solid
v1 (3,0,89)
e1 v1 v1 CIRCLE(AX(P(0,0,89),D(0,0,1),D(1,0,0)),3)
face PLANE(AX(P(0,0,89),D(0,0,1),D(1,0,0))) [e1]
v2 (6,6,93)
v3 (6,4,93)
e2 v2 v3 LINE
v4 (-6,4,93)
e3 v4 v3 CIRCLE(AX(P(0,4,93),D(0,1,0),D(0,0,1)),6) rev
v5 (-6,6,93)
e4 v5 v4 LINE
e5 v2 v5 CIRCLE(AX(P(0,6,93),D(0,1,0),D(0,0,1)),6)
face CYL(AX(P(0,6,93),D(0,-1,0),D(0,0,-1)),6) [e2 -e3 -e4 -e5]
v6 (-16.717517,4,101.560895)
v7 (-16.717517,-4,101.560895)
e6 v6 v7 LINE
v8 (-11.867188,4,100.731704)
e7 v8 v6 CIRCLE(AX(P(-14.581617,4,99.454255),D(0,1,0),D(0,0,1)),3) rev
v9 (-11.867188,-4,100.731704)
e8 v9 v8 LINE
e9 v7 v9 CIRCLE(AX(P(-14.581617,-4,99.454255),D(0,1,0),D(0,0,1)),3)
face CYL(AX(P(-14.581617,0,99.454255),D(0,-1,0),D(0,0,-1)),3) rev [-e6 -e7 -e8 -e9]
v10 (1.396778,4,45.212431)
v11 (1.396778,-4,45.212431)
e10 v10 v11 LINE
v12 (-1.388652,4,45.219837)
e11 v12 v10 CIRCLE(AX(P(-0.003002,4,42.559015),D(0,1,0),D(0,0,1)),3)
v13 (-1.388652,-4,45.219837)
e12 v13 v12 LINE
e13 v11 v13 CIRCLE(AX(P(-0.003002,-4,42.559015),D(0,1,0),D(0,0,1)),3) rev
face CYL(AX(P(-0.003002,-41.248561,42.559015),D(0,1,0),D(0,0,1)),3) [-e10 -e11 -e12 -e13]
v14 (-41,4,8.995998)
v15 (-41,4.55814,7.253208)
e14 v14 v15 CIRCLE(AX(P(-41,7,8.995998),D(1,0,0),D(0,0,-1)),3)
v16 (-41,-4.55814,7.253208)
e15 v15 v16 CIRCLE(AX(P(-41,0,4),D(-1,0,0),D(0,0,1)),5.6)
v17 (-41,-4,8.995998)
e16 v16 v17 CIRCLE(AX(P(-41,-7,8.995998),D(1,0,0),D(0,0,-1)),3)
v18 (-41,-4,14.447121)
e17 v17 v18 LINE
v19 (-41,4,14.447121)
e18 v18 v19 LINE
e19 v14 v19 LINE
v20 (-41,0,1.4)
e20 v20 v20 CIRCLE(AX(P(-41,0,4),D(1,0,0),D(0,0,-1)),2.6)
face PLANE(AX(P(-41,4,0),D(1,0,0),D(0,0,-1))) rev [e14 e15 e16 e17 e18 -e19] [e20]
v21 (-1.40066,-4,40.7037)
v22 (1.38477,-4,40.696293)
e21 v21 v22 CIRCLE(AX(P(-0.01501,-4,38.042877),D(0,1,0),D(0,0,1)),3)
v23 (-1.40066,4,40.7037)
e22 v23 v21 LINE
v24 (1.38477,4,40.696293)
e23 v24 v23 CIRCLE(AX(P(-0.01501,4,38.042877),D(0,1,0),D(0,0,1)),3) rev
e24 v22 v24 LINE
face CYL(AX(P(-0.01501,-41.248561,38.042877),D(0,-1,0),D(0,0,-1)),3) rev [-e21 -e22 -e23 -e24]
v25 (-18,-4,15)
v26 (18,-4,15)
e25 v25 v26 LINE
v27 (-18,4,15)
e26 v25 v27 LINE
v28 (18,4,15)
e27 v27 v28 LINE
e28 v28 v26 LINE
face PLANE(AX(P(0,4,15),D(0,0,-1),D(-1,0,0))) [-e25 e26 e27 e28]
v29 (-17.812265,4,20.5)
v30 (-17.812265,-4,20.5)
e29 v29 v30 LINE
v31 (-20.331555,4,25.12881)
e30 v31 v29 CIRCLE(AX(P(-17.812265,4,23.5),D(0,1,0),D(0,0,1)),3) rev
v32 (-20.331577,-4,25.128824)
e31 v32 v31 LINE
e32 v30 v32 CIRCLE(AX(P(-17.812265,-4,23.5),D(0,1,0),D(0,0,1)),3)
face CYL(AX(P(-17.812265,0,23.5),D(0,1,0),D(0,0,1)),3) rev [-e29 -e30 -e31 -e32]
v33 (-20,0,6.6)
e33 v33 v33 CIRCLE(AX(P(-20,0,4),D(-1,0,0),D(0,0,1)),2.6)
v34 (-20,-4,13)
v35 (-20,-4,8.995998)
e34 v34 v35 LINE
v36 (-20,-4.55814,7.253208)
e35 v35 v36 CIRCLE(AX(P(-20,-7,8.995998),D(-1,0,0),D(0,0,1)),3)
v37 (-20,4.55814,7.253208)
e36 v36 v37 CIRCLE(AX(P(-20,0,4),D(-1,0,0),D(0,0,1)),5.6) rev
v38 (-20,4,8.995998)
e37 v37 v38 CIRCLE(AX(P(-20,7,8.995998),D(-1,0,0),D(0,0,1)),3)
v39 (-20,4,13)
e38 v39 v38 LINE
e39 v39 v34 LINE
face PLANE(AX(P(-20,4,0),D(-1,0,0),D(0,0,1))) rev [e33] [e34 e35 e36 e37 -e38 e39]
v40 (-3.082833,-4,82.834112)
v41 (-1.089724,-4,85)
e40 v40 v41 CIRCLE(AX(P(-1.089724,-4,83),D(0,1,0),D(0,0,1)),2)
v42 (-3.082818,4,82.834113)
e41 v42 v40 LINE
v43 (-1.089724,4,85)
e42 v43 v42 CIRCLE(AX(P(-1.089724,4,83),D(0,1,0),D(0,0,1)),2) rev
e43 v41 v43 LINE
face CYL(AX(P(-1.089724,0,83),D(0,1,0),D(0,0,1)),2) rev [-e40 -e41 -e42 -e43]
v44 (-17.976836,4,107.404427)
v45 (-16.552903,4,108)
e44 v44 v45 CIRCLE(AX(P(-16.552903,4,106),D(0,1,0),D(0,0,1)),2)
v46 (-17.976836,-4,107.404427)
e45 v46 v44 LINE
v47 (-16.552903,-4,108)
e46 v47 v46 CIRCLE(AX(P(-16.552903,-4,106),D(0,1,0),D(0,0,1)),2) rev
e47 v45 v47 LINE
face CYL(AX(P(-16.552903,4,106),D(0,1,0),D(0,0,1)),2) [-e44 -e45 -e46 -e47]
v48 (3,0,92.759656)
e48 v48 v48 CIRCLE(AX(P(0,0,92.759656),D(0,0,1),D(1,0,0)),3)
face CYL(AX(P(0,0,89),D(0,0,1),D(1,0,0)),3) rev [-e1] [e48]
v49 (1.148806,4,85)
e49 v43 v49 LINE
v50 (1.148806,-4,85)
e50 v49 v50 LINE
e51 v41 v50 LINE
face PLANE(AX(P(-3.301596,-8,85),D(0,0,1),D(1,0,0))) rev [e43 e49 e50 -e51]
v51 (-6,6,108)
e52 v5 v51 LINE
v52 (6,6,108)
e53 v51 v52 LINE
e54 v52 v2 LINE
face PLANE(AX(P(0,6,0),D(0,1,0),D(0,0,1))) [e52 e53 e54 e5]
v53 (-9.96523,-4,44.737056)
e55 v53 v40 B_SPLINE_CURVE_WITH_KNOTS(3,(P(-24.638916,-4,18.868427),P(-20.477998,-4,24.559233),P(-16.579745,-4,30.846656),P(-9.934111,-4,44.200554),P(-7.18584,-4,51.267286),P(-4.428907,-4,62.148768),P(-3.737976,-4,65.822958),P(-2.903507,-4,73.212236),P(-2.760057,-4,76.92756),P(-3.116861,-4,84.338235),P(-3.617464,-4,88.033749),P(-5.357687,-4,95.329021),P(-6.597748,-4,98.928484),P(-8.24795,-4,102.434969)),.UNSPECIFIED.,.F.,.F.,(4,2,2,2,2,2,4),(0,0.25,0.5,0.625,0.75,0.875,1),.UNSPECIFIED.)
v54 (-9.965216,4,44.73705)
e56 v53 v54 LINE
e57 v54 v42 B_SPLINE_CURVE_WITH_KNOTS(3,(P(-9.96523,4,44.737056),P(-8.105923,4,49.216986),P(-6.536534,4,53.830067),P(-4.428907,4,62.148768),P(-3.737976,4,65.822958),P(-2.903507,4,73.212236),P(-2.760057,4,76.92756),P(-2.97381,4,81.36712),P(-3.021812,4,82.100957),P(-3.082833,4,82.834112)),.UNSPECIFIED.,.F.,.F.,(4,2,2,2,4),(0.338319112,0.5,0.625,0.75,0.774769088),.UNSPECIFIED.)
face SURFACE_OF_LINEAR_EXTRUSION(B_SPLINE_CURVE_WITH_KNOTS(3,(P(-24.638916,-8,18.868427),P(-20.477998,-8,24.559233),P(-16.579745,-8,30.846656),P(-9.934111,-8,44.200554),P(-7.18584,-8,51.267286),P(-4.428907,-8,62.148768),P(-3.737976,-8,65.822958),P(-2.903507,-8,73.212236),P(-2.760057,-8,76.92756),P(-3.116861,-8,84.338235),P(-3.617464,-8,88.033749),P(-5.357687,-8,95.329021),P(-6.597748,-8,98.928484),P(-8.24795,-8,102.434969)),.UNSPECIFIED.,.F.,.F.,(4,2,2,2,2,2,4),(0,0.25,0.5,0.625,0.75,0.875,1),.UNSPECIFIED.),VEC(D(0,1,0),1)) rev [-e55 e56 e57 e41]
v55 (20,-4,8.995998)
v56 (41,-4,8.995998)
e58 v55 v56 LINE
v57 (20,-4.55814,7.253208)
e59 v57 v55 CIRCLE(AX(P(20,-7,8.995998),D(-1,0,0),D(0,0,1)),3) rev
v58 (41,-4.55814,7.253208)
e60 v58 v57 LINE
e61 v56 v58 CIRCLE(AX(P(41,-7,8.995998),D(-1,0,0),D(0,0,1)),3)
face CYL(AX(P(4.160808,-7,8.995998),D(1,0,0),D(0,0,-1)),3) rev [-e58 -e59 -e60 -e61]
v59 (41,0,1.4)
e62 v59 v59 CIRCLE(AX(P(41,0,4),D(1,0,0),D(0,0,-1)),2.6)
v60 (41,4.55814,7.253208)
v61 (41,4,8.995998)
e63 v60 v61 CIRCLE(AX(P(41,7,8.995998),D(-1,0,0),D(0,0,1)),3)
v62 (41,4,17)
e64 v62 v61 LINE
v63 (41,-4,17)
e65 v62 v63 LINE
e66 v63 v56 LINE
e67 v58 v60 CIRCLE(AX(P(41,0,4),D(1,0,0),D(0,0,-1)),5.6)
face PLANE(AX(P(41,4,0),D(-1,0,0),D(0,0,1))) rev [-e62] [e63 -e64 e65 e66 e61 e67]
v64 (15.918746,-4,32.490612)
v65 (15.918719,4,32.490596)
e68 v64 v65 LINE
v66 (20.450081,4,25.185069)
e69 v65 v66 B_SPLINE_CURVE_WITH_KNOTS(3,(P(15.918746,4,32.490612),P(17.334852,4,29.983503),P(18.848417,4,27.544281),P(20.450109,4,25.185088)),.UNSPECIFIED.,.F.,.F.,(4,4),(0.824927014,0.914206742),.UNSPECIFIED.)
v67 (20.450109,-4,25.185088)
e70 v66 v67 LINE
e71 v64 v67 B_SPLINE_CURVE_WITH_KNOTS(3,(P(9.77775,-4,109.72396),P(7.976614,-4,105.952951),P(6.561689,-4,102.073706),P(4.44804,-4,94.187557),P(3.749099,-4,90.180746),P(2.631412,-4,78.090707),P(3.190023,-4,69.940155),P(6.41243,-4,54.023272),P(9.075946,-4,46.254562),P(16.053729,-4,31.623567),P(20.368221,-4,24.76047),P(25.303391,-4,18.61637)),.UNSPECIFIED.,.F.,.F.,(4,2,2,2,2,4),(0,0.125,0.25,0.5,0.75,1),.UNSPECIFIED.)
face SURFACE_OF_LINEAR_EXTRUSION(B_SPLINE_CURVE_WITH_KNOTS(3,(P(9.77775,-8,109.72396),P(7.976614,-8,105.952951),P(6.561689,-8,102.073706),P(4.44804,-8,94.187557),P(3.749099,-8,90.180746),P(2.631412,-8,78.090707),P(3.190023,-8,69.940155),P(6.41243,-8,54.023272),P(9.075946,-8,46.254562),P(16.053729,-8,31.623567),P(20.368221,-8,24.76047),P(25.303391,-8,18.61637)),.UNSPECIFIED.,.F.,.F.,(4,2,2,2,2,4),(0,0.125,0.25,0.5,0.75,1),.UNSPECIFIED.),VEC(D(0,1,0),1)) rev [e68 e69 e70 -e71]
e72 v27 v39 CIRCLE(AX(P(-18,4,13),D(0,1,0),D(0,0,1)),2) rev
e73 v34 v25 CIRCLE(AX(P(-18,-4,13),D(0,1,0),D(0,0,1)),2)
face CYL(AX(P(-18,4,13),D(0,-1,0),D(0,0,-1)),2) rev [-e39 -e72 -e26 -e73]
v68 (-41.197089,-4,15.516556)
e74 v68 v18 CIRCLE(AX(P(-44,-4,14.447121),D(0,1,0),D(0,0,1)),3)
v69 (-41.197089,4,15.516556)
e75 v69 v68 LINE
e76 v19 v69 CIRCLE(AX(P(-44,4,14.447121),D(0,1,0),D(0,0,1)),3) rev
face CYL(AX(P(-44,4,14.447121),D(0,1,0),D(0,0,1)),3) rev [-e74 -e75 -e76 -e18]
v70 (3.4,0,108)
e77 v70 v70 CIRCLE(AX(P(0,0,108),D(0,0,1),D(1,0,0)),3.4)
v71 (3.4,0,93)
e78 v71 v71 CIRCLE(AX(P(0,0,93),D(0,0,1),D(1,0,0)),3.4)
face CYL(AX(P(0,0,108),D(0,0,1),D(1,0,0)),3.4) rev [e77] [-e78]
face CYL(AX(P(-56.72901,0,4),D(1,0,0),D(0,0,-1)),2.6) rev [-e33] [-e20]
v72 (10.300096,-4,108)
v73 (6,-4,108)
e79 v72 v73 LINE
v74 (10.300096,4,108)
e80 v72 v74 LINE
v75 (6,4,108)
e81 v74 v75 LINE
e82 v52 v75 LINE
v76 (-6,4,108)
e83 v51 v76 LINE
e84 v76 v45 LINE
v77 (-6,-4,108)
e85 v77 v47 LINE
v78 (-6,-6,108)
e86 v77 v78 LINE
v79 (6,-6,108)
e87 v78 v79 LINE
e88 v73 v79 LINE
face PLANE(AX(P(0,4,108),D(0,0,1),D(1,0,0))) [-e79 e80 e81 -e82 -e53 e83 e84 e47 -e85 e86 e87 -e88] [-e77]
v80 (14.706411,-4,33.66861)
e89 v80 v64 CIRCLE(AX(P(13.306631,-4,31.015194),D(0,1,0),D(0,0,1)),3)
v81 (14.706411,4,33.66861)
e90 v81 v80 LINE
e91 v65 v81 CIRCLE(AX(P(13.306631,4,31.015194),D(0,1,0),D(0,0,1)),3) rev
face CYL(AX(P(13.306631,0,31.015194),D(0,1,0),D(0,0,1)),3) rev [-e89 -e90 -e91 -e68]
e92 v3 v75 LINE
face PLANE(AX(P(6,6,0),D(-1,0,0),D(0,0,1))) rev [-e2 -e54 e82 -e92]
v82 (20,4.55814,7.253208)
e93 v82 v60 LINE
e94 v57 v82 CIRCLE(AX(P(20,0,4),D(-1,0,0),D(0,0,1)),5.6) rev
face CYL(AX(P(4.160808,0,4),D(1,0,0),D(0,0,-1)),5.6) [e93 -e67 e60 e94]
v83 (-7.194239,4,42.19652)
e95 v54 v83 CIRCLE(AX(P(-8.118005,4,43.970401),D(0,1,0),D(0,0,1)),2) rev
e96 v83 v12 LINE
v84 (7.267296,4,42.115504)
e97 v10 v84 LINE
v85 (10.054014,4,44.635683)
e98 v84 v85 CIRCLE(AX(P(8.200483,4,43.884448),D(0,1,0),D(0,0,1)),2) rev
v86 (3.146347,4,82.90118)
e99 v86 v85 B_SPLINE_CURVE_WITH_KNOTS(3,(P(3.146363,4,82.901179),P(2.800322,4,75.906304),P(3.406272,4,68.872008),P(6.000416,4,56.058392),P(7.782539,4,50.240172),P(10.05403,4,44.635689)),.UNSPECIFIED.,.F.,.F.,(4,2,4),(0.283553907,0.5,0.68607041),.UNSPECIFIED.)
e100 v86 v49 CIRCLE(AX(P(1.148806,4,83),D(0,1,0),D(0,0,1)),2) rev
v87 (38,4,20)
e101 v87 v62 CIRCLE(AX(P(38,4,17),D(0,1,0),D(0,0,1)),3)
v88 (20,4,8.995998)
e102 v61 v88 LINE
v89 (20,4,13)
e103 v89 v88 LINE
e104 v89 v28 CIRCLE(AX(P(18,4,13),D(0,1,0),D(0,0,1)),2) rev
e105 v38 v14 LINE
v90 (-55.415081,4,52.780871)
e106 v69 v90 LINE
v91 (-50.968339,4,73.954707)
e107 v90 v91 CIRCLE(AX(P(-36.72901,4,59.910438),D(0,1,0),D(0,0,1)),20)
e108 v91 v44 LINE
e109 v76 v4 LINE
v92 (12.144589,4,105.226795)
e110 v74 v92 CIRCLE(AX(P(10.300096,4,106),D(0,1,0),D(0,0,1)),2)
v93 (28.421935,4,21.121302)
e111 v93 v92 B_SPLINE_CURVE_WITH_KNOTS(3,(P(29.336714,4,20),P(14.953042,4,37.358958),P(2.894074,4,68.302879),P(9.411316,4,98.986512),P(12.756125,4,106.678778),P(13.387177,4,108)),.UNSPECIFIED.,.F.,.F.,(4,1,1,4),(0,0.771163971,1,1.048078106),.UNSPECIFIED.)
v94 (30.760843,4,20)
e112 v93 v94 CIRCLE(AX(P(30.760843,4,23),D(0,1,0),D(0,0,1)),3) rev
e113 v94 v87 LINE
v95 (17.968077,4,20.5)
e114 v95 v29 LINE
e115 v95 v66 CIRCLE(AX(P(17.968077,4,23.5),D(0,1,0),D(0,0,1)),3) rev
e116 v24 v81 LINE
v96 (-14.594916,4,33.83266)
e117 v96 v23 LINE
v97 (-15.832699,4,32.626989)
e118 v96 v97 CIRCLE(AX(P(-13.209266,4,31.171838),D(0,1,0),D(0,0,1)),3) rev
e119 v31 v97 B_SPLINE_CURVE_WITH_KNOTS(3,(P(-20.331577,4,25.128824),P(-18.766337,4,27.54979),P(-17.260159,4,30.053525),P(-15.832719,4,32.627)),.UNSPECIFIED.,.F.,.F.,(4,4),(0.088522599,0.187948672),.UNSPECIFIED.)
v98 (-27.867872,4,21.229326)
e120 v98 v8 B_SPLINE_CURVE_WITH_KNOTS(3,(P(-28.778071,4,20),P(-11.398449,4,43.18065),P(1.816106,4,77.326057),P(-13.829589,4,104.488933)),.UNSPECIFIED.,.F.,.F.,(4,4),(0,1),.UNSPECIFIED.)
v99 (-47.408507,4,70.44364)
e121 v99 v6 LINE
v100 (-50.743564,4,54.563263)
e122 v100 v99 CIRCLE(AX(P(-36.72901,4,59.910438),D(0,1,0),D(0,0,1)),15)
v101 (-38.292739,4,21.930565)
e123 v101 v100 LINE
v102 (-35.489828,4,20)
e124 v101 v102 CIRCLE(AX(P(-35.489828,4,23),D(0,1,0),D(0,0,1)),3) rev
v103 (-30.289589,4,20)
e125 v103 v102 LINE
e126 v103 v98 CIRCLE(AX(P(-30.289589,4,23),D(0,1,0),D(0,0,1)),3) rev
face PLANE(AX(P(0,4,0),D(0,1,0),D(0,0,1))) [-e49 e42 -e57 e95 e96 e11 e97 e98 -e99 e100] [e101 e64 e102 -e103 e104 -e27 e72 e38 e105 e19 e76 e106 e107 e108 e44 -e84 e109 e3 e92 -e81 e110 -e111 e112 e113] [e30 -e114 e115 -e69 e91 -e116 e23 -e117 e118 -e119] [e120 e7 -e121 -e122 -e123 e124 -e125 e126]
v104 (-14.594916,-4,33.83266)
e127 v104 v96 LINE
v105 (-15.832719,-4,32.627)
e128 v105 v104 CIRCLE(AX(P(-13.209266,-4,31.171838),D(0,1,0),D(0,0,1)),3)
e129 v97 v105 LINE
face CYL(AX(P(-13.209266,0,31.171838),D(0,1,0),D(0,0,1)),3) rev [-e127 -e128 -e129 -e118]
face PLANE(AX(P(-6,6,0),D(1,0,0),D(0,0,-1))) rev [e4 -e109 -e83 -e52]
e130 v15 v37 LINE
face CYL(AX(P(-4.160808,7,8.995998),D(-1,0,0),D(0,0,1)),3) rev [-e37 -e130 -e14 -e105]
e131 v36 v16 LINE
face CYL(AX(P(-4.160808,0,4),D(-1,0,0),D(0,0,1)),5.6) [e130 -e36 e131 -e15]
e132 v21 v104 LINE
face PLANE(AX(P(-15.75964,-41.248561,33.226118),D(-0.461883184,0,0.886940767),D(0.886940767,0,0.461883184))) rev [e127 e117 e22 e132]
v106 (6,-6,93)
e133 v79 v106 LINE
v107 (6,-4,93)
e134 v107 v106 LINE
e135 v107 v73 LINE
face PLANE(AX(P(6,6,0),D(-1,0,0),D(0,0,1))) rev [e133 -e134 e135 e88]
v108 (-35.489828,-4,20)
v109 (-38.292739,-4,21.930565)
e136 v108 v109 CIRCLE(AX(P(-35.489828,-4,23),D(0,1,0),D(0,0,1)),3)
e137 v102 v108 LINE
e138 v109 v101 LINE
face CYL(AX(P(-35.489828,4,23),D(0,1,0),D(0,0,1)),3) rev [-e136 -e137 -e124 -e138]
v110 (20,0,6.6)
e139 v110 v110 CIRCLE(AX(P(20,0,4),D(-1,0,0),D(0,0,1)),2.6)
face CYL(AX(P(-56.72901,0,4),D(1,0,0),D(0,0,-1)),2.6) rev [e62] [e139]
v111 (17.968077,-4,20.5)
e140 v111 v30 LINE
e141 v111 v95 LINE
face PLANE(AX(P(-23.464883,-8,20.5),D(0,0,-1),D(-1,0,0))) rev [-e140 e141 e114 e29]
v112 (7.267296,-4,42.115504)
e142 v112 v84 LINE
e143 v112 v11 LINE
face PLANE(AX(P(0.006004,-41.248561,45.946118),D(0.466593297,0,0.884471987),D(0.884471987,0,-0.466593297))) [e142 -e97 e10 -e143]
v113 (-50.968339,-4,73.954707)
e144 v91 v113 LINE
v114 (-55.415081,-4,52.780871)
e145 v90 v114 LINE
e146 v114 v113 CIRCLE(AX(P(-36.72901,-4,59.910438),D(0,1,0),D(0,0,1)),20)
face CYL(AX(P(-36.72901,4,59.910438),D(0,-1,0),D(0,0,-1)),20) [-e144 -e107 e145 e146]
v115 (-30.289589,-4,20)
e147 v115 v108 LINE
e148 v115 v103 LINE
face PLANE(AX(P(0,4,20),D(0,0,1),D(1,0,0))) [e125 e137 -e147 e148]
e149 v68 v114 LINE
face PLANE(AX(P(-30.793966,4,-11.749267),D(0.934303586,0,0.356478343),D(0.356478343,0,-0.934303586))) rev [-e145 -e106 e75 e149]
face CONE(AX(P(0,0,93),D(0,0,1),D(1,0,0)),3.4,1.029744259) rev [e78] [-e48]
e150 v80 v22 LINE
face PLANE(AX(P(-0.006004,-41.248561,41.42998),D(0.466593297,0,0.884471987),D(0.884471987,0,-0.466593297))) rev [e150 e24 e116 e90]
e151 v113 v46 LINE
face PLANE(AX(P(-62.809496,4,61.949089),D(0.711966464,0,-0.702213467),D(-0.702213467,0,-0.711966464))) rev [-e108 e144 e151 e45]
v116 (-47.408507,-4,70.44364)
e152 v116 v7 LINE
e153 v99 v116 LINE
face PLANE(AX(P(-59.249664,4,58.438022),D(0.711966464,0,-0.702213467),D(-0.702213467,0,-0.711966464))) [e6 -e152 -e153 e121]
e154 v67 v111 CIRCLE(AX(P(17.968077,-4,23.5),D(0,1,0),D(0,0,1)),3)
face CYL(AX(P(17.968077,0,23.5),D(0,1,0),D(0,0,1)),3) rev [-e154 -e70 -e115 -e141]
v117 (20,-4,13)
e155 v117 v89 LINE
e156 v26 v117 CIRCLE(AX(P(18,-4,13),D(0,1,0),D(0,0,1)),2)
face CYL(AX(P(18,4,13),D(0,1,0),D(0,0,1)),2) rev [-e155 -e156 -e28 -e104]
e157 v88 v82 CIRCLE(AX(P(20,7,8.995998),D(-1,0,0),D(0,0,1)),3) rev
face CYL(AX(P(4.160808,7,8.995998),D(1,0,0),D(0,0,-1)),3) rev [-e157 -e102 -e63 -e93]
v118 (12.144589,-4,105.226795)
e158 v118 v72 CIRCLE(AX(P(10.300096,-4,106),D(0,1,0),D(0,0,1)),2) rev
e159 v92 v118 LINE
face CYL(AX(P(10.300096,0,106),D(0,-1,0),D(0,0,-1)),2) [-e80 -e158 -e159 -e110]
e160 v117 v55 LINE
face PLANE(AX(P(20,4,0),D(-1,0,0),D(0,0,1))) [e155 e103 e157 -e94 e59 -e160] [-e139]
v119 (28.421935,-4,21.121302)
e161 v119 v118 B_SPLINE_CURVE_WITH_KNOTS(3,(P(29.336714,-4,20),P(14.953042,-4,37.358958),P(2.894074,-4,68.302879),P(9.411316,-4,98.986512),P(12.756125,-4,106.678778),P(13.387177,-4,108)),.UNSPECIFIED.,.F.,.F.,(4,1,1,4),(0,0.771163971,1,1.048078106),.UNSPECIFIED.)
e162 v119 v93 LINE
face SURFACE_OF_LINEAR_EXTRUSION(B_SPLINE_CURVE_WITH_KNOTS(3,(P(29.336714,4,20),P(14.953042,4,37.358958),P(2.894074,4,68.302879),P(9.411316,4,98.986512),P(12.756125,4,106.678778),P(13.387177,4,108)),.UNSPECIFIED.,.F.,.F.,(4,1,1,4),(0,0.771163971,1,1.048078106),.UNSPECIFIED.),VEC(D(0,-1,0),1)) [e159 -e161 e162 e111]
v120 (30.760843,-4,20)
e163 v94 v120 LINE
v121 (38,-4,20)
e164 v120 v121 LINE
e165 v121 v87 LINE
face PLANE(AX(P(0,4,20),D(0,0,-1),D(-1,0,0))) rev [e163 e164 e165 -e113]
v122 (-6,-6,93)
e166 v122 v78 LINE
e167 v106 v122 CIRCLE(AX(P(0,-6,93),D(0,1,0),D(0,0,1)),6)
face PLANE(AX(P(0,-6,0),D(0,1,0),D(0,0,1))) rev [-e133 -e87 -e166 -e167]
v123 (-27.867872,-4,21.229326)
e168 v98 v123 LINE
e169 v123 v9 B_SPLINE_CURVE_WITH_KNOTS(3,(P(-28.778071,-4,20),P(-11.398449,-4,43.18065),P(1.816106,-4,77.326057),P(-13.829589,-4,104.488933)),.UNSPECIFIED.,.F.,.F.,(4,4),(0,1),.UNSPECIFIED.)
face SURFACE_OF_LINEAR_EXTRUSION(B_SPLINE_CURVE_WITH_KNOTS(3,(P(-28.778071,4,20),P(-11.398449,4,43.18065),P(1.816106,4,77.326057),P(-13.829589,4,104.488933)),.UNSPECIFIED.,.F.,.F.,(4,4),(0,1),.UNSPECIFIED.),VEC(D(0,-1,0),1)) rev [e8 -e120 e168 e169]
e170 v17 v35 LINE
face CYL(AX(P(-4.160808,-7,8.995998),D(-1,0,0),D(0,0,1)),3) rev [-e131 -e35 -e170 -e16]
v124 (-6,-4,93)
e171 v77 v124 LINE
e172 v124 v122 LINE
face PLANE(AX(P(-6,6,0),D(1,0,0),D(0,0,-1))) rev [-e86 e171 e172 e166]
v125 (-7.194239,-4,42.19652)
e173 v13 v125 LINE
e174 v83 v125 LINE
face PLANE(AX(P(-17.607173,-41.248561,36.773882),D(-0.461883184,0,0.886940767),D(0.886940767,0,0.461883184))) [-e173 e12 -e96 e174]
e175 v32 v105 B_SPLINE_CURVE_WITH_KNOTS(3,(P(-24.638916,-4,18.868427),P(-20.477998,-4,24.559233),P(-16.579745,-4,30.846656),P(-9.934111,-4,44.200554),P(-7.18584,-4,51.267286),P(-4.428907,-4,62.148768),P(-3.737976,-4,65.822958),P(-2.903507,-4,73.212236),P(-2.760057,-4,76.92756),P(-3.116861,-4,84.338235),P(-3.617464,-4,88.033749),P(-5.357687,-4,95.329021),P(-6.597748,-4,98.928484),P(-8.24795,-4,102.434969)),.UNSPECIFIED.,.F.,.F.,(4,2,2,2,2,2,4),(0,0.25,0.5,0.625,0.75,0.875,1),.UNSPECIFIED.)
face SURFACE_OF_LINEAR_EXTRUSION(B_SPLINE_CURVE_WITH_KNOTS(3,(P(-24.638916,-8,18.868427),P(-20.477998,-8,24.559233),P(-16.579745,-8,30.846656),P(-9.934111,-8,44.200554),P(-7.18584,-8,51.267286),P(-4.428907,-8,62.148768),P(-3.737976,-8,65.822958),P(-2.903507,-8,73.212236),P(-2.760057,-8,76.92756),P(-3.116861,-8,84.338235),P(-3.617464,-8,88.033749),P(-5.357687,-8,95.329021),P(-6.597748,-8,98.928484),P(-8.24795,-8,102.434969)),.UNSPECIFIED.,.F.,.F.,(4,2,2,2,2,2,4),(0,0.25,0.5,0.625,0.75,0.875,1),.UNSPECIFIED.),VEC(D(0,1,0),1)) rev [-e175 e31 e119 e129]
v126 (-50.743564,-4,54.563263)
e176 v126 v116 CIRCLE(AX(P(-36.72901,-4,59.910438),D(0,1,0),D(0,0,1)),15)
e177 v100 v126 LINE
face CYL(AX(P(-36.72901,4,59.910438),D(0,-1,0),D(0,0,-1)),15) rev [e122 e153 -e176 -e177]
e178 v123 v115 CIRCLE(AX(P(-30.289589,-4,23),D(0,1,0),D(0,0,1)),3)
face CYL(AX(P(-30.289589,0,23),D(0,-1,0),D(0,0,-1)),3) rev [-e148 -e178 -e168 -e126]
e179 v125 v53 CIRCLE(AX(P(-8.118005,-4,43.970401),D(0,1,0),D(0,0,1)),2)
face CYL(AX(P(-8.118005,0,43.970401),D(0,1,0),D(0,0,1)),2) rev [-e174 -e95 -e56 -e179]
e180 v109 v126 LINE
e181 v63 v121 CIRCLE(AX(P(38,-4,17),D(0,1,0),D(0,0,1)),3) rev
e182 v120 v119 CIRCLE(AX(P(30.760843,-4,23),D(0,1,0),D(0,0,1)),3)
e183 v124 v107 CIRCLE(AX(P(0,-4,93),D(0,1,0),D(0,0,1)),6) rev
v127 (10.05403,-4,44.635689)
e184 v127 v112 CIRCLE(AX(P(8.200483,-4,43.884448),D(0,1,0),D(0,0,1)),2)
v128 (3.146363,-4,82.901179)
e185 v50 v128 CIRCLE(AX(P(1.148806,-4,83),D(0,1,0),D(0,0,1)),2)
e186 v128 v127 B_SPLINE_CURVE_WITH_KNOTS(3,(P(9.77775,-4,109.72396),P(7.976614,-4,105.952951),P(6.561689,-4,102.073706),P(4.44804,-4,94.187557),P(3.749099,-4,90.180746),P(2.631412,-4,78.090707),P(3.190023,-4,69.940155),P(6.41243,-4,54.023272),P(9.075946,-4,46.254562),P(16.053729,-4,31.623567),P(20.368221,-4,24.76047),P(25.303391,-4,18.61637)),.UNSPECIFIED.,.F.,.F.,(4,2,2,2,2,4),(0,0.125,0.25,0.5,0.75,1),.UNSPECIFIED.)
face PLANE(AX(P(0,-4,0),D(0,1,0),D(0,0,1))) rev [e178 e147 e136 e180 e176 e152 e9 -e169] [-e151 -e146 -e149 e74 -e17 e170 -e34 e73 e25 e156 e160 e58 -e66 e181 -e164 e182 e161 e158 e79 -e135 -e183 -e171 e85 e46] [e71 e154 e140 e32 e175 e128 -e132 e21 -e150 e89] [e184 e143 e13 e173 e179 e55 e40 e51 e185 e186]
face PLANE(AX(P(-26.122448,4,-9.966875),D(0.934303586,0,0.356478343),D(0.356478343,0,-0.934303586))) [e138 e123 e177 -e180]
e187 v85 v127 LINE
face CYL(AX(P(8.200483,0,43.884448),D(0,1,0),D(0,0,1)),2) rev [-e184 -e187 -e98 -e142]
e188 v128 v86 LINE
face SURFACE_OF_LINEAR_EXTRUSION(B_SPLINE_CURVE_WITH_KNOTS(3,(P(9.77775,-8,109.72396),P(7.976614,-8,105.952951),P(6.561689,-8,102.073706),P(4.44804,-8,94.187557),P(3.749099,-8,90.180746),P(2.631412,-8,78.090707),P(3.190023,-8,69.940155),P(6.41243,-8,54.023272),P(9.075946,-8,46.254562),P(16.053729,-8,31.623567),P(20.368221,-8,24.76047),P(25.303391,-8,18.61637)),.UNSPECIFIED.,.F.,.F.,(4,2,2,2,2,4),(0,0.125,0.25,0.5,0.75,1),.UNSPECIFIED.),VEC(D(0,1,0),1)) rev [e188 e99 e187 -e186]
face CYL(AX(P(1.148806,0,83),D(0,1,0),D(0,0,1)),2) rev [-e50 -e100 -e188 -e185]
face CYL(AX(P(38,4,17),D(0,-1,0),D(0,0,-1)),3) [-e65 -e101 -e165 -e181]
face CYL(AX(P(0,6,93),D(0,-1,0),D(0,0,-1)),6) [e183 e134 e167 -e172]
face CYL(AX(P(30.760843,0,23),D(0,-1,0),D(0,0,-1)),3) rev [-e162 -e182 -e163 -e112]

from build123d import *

# Parameters (mm, degrees)
EXTRUDE_1_DEPTH        = 4
FILLET_1_R             = 4
SKETCH_4_R             = 2.6
CUT_EXTRUDE_1_DEPTH    = 146.708473979
FILLET_2_R             = 3
FILLET_3_R             = 3
SKETCH_6_R             = 6
EXTRUDE_3_DEPTH        = 6
CUT_EXTRUDE_2_DEPTH    = 12
FILLET_4_R             = 3
FILLET_5_R             = 2
FILLET_6_R             = 2
EXTRUDE_5_DEPTH        = 8
FILLET_7_R             = 2
FILLET_8_R             = 3
FILLET_9_R             = 2
FILLET_10_R            = 2
SKETCH_11_R            = 3
CUT_EXTRUDE_3_DEPTH    = 19
HOLE_WIZARD_M8_3_D     = 6.8
HOLE_WIZARD_M8_3_DEPTH = 15
HOLE_WIZARD_M8_3_TIP   = 2.042926105
SKETCH_14_R            = 5.6
SKETCH_14_R_2          = 2.6
EXTRUDE_6_DEPTH        = 21
EXTRUDE_START          = -21
SKETCH_15_R            = 5.6
SKETCH_15_R_2          = 2.6
EXTRUDE_7_DEPTH        = 21
FILLET_11_R            = 3


with BuildPart() as part:
    # 草图1 → 凸台-拉伸1 (new, symmetric)
    with BuildSketch(Plane(origin=(0, 0, 0), x_dir=(1, 0, 0), z_dir=(0, 1, 0))):
        with BuildLine():
            Line((-20, 0), (-41, 0))
            Line((-41, 0), (-41, -15))
            Line((-41, -15), (-55.415081473, -52.780871033))
            ThreePointArc((-55.415081473, -52.780871033), (-56.302035651, -64.020992263), (-50.968339036, -73.954707247))
            Line((-50.968339036, -73.954707247), (-17.38942166, -108))
            Line((-17.38942166, -108), (13.387176951, -108))
            add(Edge.make_bspline(
                [(11.643587669, -103.995199619), (12.175396299, -105.343239297), (12.756125427, -106.67877823), (13.387176951, -108)],
                knots=[1, 1, 1, 1, 1.048078106, 1.048078106, 1.048078106, 1.048078106], degree=3))
            add(Edge.make_bspline(
                [(29.336714137, -20), (14.953042407, -37.358957509), (2.894073745, -68.302879354), (9.112352893, -97.578972573), (11.643587669, -103.995199619)],
                knots=[0, 0, 0, 0, 0.771163971, 1, 1, 1, 1], degree=3))
            Line((29.336714137, -20), (41, -20))
            Line((41, -20), (41, -15))
            Line((41, -15), (41, 0))
            Line((41, 0), (20, 0))
            Line((20, 0), (20, -15))
            Line((20, -15), (-20, -15))
            Line((-20, -15), (-20, 0))
        make_face()
        with BuildLine():
            Line((-37.556142637, -20), (-28.778071319, -20))
            add(Edge.make_bspline(
                [(-28.778071319, -20), (-11.398449347, -43.180650425), (1.816105739, -77.326056937), (-13.829589339, -104.488932663)],
                knots=[0, 0, 0, 0, 1, 1, 1, 1], degree=3))
            Line((-13.829589339, -104.488932663), (-47.408506715, -70.44363991))
            ThreePointArc((-47.408506715, -70.44363991), (-51.408779177, -62.993353671), (-50.743563543, -54.563262749))
            Line((-50.743563543, -54.563262749), (-37.556142637, -20))
        make_face(mode=Mode.SUBTRACT)
    extrude(amount=EXTRUDE_1_DEPTH, both=True)

    # 圆角1
    fillet_1_edges = [part.edges().sort_by_distance(p)[0] for p in [
        (-30.5, 4, 0),
        (-30.5, -4, 0),
        (30.5, -4, 0),
        (30.5, 4, 0),
    ]]
    fillet(fillet_1_edges, radius=FILLET_1_R - 0.0001)  # a hair under: the kernel refuses the full size

    # 草图4 → 切除-拉伸1 (cut, through all)
    with BuildSketch(Plane(origin=(41, 0, 0), x_dir=(0, 0, -1), z_dir=(1, 0, 0))):
        with Locations((-4, 0)):
            Circle(SKETCH_4_R)
    extrude(amount=-CUT_EXTRUDE_1_DEPTH, mode=Mode.SUBTRACT)

    # 圆角2
    fillet_2_edges = [part.edges().sort_by_distance(p)[0] for p in [
        (-41, 0, 15),
        (-28.778071319, -2, 20),
        (-37.556142637, 0, 20),
        (41, 0, 20),
        (29.336714137, -2, 20),
    ]]
    fillet(fillet_2_edges, radius=FILLET_2_R)

    # 圆角3
    fillet_3_edges = [part.edges().sort_by_distance(p)[0] for p in [
        (-13.829589339, -2, 104.488932663),
    ]]
    fillet(fillet_3_edges, radius=FILLET_3_R)

    # 草图6 → 凸台-拉伸3 (add, symmetric)
    with BuildSketch(Plane(origin=(0, 0, 0), x_dir=(1, 0, 0), z_dir=(0, 1, 0))):
        with BuildLine():
            ThreePointArc((6, -93), (0, -99), (-6, -93))
            Line((-6, -93), (-6, -108))
            Line((-6, -108), (6, -108))
            Line((6, -108), (6, -93))
        make_face()
        with Locations((0, -93)):
            Circle(SKETCH_6_R)
    extrude(amount=EXTRUDE_3_DEPTH, both=True)

    # 草图9 → 切除-拉伸2 (cut)
    with BuildSketch(Plane(origin=(0, 4, 0), x_dir=(1, 0, 0), z_dir=(0, 1, 0))):
        with BuildLine():
            Line((-3.301596304, -85), (3.279031365, -85))
            add(Edge.make_bspline(
                [(23.82705745, -20.5), (19.505008519, -26.151605233), (15.701306988, -32.362525218), (9.075946345, -46.254561975), (6.412430162, -54.023271907), (3.266661612, -69.561604001), (2.686935669, -77.315763608), (3.279031365, -85)],
                knots=[0.025253164, 0.025253164, 0.025253164, 0.025253164, 0.25, 0.25, 0.5, 0.5, 0.73810851, 0.73810851, 0.73810851, 0.73810851], degree=3))
            Line((23.82705745, -20.5), (-23.464882608, -20.5))
            add(Edge.make_bspline(
                [(-23.464882608, -20.5), (-19.745298249, -25.752793711), (-16.265276937, -31.478555693), (-9.934110548, -44.200553579), (-7.185840369, -51.267285983), (-4.428907167, -62.148768173), (-3.737975942, -65.822957616), (-2.903507141, -73.212236362), (-2.760056502, -76.927560065), (-3.008657599, -82.090891991), (-3.128742658, -83.54736568), (-3.301596304, -85)],
                knots=[0.023659765, 0.023659765, 0.023659765, 0.023659765, 0.25, 0.25, 0.5, 0.5, 0.625, 0.625, 0.75, 0.75, 0.799185621, 0.799185621, 0.799185621, 0.799185621], degree=3))
        make_face()
    extrude(amount=-CUT_EXTRUDE_2_DEPTH, mode=Mode.SUBTRACT)

    # 圆角4
    fillet_4_edges = [part.edges().sort_by_distance(p)[0] for p in [
        (23.82705745, 0, 20.5),
        (-23.464882608, 0, 20.5),
    ]]
    fillet(fillet_4_edges, radius=FILLET_4_R)

    # 圆角5
    fillet_5_edges = [part.edges().sort_by_distance(p)[0] for p in [
        (-3.301596304, 0, 85),
        (3.279031365, 0, 85),
    ]]
    fillet(fillet_5_edges, radius=FILLET_5_R)

    # 圆角6
    fillet_6_edges = [part.edges().sort_by_distance(p)[0] for p in [
        (-20, 0, 15),
        (20, 0, 15),
    ]]
    fillet(fillet_6_edges, radius=FILLET_6_R)

    # 草图10 → 凸台-拉伸5 (add)
    with BuildSketch(Plane(origin=(0, 4, 0), x_dir=(1, 0, 0), z_dir=(0, 1, 0))):
        Polygon((-17.607172891, -36.773881534), (0.006004111, -45.946117812), (17.402210236, -36.768943973), (15.535837047, -33.231056027), (-0.006004111, -41.429980382), (-15.759640154, -33.226118466), align=None)
    extrude(amount=-EXTRUDE_5_DEPTH)

    # 圆角7
    fillet_7_edges = [part.edges().sort_by_distance(p)[0] for p in [
        (12.323790715, 0, 39.448007353),
        (-12.270659934, 0, 39.552923483),
    ]]
    fillet(fillet_7_edges, radius=FILLET_7_R)

    # 圆角8
    fillet_8_edges = [part.edges().sort_by_distance(p)[0] for p in [
        (-15.400235002, 0, 33.413282257),
        (15.491481072, 0, 33.254455525),
        (0.006004111, 0, 45.946117812),
        (-0.006004111, 0, 41.429980382),
    ]]
    fillet(fillet_8_edges, radius=FILLET_8_R)

    # 圆角9
    fillet_9_edges = [part.edges().sort_by_distance(p)[0] for p in [
        (13.387176951, -2, 108),
    ]]
    fillet(fillet_9_edges, radius=FILLET_9_R)

    # 圆角10
    fillet_10_edges = [part.edges().sort_by_distance(p)[0] for p in [
        (-17.38942166, 0, 108),
    ]]
    fillet(fillet_10_edges, radius=FILLET_10_R)

    # 草图11 → 切除-拉伸3 (cut)
    with BuildSketch(Plane.XY.offset(108)):
        Circle(SKETCH_11_R)
    extrude(amount=-CUT_EXTRUDE_3_DEPTH, mode=Mode.SUBTRACT)

    # M8 螺纹孔3
    with Locations(Plane.XY.offset(108)):
        with Locations((0, 0)):
            Hole(HOLE_WIZARD_M8_3_D / 2, depth=HOLE_WIZARD_M8_3_DEPTH)
            with Locations((0, 0, -(HOLE_WIZARD_M8_3_DEPTH + HOLE_WIZARD_M8_3_TIP / 2))):  # 118° drill point
                Cone(0, HOLE_WIZARD_M8_3_D / 2, HOLE_WIZARD_M8_3_TIP, mode=Mode.SUBTRACT)

    # 草图14 → 凸台-拉伸6 (add)
    with BuildSketch(Plane(origin=(41, 0, 0), x_dir=(0, 0, -1), z_dir=(1, 0, 0))):
        with Locations((-4, 0)):
            Circle(SKETCH_14_R)
        with Locations((-4, 0)):
            Circle(SKETCH_14_R_2, mode=Mode.SUBTRACT)
    extrude(amount=-EXTRUDE_6_DEPTH)

    # 草图15 → 凸台-拉伸7 (add)
    with BuildSketch(Plane.ZY.offset(41).offset(EXTRUDE_START)):
        with Locations((4, 0)):
            Circle(SKETCH_15_R)
        with Locations(Location((4, 0, 0), (0, 0, 180))):
            Circle(SKETCH_15_R_2, mode=Mode.SUBTRACT)
    extrude(amount=EXTRUDE_7_DEPTH)

    # 圆角11
    fillet_11_edges = [part.edges().sort_by_distance(p)[0] for p in [
        (30.5, -4, 7.919183588),
        (30.5, 4, 7.919183588),
        (-30.5, -4, 7.919183588),
        (-30.5, 4, 7.919183588),
    ]]
    fillet(fillet_11_edges, radius=FILLET_11_R)


solid = part.part
